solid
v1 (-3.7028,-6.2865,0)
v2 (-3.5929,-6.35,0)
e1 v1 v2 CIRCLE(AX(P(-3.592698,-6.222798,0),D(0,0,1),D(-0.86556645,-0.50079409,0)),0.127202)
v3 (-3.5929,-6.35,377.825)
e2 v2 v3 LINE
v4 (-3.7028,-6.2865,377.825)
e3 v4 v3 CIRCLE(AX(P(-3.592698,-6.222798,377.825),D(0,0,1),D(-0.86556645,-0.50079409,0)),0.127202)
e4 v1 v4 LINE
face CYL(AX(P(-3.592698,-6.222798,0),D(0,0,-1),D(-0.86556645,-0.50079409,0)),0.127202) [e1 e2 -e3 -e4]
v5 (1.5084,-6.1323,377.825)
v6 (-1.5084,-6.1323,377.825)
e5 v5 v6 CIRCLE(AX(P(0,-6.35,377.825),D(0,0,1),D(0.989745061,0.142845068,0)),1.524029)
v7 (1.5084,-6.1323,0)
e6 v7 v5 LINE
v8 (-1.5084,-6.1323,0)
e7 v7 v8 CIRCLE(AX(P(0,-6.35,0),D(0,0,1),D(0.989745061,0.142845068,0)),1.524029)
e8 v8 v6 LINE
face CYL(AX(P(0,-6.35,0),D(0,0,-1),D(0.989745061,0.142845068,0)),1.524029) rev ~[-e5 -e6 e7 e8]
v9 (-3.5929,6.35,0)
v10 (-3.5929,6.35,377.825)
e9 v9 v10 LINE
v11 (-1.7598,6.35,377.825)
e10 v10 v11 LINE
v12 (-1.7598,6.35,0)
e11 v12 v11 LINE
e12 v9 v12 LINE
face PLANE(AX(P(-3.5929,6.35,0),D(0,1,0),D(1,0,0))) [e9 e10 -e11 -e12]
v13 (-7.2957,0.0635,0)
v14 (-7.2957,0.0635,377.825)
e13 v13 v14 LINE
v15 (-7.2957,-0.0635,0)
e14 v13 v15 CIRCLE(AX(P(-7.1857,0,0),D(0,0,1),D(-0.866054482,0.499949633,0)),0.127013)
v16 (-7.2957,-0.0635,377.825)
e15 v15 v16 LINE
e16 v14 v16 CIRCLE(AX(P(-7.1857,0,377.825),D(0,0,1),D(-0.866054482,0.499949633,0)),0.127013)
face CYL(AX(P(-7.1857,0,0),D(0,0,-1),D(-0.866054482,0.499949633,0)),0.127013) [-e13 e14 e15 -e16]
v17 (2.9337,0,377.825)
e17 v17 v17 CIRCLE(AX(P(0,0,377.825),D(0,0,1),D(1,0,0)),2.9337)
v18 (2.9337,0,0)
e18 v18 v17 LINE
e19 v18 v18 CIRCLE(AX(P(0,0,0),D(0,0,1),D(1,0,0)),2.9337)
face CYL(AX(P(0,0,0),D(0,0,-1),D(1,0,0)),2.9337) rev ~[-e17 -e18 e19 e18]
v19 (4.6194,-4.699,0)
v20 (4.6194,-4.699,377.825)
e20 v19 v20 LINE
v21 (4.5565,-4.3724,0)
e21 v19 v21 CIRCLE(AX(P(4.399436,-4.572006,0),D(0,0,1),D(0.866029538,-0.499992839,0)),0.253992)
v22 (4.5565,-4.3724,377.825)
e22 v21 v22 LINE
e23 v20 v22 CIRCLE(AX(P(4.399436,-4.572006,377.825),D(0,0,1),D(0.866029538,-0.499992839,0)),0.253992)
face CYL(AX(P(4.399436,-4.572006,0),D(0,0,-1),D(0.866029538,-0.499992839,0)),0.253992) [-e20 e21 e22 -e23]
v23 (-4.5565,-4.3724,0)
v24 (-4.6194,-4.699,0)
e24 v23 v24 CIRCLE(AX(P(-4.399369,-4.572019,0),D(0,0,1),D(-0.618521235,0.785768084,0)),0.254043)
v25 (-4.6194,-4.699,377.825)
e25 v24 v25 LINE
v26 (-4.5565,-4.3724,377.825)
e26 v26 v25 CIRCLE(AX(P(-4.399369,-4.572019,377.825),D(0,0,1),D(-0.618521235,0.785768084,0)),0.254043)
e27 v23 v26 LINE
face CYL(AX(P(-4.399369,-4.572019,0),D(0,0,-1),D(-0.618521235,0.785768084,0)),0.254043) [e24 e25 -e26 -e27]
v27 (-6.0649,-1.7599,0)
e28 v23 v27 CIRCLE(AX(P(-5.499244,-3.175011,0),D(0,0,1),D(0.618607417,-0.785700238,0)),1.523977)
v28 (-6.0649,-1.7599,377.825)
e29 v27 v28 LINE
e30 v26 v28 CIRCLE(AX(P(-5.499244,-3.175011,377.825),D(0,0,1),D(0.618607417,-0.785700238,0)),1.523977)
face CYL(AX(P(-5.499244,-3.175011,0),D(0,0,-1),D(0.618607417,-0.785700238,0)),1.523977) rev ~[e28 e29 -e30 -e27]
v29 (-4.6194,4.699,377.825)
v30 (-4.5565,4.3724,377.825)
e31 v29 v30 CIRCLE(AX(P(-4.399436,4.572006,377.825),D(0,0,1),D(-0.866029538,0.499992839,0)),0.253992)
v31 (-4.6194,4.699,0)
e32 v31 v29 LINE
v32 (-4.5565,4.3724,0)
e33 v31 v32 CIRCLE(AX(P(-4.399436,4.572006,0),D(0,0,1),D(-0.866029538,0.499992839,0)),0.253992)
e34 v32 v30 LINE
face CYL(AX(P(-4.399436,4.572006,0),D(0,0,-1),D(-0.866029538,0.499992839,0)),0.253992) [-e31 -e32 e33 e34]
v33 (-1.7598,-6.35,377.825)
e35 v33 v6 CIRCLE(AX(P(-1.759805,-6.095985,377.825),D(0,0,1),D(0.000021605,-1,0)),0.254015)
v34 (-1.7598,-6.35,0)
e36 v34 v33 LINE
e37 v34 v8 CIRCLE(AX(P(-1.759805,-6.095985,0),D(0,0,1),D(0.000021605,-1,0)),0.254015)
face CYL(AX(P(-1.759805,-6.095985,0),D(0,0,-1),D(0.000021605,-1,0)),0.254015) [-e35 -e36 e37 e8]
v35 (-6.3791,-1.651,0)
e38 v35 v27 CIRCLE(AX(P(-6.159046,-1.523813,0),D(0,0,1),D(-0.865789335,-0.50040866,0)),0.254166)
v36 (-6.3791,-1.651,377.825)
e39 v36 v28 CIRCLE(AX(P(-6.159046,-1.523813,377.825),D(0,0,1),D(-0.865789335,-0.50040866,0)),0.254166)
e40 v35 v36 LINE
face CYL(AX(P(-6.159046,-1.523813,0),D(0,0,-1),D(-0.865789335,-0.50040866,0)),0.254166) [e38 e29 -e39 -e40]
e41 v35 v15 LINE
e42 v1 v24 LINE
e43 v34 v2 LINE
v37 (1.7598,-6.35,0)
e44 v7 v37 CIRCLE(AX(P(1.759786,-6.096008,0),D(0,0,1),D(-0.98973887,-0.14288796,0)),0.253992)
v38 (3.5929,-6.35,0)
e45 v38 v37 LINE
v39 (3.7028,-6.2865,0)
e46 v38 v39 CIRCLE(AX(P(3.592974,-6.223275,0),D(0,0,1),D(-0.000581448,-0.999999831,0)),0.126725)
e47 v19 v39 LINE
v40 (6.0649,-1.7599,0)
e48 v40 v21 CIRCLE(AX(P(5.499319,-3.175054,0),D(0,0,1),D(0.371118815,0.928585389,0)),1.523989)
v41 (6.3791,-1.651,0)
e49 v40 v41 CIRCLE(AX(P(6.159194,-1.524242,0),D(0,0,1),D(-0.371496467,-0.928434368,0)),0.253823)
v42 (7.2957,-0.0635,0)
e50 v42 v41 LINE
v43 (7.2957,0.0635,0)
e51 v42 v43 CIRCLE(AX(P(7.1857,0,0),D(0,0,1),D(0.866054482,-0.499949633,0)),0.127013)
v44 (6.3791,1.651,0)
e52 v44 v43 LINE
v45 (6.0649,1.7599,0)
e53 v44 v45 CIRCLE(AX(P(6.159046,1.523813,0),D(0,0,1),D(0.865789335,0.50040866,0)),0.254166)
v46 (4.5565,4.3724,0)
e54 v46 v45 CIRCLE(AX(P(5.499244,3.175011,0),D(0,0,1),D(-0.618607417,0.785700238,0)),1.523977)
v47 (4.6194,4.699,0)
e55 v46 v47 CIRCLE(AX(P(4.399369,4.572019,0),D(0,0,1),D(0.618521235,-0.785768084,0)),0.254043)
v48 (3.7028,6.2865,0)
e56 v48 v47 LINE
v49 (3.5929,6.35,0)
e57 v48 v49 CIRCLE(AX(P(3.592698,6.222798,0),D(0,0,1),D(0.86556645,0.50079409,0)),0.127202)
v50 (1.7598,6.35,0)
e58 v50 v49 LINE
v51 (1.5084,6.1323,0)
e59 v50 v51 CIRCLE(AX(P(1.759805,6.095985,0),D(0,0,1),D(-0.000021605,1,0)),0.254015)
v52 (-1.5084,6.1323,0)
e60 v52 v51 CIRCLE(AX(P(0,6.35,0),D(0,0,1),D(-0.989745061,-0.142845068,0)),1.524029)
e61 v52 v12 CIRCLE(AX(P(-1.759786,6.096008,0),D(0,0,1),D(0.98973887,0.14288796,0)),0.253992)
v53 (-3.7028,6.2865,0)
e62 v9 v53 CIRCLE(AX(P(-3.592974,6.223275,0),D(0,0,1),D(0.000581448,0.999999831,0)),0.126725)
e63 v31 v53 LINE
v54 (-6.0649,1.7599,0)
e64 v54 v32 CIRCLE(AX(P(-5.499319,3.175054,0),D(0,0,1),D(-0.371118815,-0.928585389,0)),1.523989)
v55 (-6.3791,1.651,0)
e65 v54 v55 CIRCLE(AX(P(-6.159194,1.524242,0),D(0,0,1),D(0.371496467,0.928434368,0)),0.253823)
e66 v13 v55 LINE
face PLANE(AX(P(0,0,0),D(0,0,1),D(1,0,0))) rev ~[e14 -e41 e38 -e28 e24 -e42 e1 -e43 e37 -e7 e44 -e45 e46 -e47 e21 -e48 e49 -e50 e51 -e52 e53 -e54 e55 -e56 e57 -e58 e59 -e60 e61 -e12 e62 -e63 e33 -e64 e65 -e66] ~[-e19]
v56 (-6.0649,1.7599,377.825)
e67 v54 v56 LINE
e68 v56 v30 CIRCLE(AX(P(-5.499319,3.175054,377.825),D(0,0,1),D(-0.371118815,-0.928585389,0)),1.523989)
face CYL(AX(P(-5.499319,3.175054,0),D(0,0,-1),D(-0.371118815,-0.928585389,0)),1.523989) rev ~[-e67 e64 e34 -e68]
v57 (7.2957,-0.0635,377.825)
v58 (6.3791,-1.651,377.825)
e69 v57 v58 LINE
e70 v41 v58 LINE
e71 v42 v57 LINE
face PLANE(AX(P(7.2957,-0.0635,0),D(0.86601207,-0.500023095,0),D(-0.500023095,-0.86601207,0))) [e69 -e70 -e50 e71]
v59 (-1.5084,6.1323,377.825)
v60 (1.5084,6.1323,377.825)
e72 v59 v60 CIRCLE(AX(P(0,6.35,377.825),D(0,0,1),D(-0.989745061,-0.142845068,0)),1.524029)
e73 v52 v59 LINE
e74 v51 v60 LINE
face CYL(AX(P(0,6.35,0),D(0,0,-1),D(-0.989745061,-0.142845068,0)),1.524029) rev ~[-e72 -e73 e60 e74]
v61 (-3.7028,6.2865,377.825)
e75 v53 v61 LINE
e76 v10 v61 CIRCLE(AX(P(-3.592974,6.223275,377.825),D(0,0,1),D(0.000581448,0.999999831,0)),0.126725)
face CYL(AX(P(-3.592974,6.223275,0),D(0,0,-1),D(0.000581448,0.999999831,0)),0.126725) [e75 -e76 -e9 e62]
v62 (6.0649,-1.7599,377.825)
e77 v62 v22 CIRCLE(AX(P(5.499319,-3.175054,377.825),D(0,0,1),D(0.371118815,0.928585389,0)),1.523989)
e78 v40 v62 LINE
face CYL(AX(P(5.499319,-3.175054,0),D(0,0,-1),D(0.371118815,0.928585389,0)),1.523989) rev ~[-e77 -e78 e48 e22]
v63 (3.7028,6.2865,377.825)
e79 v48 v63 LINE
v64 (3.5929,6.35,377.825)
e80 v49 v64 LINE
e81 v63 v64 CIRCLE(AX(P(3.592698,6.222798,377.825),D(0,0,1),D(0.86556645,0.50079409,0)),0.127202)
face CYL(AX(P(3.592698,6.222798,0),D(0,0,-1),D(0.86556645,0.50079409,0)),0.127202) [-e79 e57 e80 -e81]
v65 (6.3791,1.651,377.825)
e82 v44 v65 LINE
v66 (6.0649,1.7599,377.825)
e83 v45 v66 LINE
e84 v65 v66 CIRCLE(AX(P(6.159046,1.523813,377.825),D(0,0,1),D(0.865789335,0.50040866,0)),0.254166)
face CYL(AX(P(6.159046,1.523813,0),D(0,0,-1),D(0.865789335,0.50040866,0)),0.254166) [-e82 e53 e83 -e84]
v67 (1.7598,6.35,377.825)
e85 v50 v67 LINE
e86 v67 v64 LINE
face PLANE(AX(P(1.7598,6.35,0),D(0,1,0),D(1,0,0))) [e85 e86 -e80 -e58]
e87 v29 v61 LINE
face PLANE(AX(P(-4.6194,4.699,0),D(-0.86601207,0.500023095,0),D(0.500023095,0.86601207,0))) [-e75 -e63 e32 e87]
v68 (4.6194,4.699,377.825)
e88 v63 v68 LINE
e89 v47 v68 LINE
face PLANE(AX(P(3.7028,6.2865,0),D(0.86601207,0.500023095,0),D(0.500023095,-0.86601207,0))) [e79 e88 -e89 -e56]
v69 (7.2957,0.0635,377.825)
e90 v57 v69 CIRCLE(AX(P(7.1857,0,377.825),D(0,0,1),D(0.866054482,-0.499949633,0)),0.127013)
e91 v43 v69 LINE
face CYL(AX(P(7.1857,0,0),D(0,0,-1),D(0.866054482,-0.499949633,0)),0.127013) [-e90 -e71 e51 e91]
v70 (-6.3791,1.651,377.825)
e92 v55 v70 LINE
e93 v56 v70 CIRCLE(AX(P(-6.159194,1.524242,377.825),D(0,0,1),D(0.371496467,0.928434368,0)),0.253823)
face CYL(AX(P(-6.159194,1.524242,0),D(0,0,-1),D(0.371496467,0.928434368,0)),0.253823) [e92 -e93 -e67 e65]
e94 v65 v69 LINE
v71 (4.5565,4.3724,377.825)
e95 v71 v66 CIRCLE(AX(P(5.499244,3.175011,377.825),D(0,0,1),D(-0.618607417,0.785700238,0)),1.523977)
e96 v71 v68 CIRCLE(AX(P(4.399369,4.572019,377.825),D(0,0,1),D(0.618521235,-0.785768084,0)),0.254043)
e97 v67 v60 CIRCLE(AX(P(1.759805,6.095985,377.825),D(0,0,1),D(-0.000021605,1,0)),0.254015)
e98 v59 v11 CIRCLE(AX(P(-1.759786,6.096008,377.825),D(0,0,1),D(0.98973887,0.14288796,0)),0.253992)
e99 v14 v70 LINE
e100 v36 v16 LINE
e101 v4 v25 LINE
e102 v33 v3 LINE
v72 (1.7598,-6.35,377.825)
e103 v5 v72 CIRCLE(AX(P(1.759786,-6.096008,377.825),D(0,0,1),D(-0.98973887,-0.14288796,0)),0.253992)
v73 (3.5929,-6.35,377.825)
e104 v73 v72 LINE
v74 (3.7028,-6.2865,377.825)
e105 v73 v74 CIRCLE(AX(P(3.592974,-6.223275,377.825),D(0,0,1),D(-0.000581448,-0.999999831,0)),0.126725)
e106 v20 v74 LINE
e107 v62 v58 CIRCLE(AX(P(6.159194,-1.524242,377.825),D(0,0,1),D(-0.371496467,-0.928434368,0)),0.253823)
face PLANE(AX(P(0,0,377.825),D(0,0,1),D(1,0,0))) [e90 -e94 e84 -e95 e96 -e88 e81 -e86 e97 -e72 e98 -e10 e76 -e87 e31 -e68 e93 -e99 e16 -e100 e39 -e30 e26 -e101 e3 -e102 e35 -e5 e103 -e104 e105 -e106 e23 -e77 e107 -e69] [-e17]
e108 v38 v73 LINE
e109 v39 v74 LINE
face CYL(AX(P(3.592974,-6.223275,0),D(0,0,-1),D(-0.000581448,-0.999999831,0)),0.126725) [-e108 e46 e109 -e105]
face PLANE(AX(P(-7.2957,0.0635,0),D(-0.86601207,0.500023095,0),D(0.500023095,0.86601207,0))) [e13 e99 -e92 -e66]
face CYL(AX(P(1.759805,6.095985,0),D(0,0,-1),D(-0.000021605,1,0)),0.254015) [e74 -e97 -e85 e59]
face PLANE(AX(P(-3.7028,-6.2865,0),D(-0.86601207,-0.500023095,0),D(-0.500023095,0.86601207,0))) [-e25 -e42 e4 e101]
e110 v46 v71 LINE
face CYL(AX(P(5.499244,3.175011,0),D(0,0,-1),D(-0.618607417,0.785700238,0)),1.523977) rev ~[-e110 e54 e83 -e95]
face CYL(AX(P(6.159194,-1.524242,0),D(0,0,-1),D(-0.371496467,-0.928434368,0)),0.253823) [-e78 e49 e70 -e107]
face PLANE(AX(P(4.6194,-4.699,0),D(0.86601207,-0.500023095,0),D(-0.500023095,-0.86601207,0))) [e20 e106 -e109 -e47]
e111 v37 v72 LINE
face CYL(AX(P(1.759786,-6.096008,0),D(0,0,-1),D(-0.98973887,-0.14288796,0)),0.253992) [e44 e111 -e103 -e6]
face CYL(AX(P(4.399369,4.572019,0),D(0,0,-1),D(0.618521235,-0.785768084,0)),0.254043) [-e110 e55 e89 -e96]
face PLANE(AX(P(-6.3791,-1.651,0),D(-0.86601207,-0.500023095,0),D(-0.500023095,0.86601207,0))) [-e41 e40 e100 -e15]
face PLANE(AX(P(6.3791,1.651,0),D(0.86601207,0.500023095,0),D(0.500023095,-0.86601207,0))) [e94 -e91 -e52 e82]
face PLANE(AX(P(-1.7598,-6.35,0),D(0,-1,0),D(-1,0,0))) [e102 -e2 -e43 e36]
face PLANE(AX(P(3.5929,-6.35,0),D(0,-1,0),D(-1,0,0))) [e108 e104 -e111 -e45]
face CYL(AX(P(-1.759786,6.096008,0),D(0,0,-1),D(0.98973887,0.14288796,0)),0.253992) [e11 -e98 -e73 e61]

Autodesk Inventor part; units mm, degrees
ref_plane "YZ Plane" through (0, 0, 0) normal (1, 0, 0) x (0, 1, 0)
ref_plane "XZ Plane" through (0, 0, 0) normal (0, 1, 0) x (-1, 0, 0)
ref_plane "XY Plane" through (0, 0, 0) normal (0, 0, 1) x (1, 0, 0)
sketch "CrossHexProfile" plane through (0, 0, 0) normal (0, 0, 1) x (1, 0, 0)
  arc A0 (1.7598, 0) -> (1.5084, -0.2177) centre (1.7598, -0.254) ccw
  line L0 (1.7598, 0) -> (3.5929, 0)
  arc A1 (3.7028, -0.0635) -> (3.5929, 0) centre (3.5929, -0.127) ccw
  line L1 (3.7028, -0.0635) -> (4.6194, -1.651)
  arc A2 (4.5565, -1.9776) -> (4.6194, -1.651) centre (4.3994, -1.778) ccw
  arc A3 (4.5565, -1.9776) -> (6.0649, -4.5901) centre (5.4993, -3.175) ccw
  arc A4 (-1.5084, -0.2177) -> (1.5084, -0.2177) centre (0, 0) ccw
  arc A5 (-4.5565, -10.7224) -> (-4.6194, -11.049) centre (-4.3994, -10.922) ccw
  arc A6 (-4.5565, -10.7224) -> (-6.0649, -8.1099) centre (-5.4993, -9.525) ccw
  arc A7 (-6.3791, -8.001) -> (-6.0649, -8.1099) centre (-6.1592, -7.874) ccw
  line L2 (-6.3791, -8.001) -> (-7.2957, -6.4135)
  arc A8 (-7.2957, -6.2865) -> (-7.2957, -6.4135) centre (-7.1857, -6.35) ccw
  arc A9 (-6.0649, -4.5901) -> (-6.3791, -4.699) centre (-6.1592, -4.826) ccw
  line L3 (-7.2957, -6.2865) -> (-6.3791, -4.699)
  arc A10 (-1.5084, -0.2177) -> (-1.7598, 0) centre (-1.7598, -0.254) ccw
  line L4 (-3.5929, 0) -> (-1.7598, 0)
  arc A11 (-3.5929, 0) -> (-3.7028, -0.0635) centre (-3.5929, -0.127) ccw
  line L5 (-4.6194, -1.651) -> (-3.7028, -0.0635)
  arc A12 (-4.6194, -1.651) -> (-4.5565, -1.9776) centre (-4.3994, -1.778) ccw
  arc A13 (-6.0649, -4.5901) -> (-4.5565, -1.9776) centre (-5.4993, -3.175) ccw
  line L6 (-3.7028, -12.6365) -> (-4.6194, -11.049)
  circle A14 centre (0, -6.35) radius 2.9337
  arc A15 (-3.7028, -12.6365) -> (-3.5929, -12.7) centre (-3.5929, -12.573) ccw
  line L7 (-1.7598, -12.7) -> (-3.5929, -12.7)
  arc A16 (-1.7598, -12.7) -> (-1.5084, -12.4823) centre (-1.7598, -12.446) ccw
  arc A17 (1.5084, -12.4823) -> (-1.5084, -12.4823) centre (0, -12.7) ccw
  arc A18 (1.5084, -12.4823) -> (1.7598, -12.7) centre (1.7598, -12.446) ccw
  line L8 (3.5929, -12.7) -> (1.7598, -12.7)
  arc A19 (3.5929, -12.7) -> (3.7028, -12.6365) centre (3.5929, -12.573) ccw
  line L9 (4.6194, -11.049) -> (3.7028, -12.6365)
  arc A20 (6.3791, -4.699) -> (6.0649, -4.5901) centre (6.1592, -4.826) ccw
  line L10 (6.3791, -4.699) -> (7.2957, -6.2865)
  arc A21 (7.2957, -6.4135) -> (7.2957, -6.2865) centre (7.1857, -6.35) ccw
  arc A22 (6.0649, -8.1099) -> (6.3791, -8.001) centre (6.1592, -7.874) ccw
  line L11 (7.2957, -6.4135) -> (6.3791, -8.001)
  arc A23 (4.6194, -11.049) -> (4.5565, -10.7224) centre (4.3994, -10.922) ccw
  arc A24 (6.0649, -8.1099) -> (4.5565, -10.7224) centre (5.4993, -9.525) ccw
  point P0 (0, -6.35)
sketch "Sketch1" plane through (0, 0, 0) normal (0, 0, 1) x (1, 0, 0)
  arc A0 (1.7598, 6.35) -> (1.5084, 6.1323) centre (1.7598, 6.096) ccw
  line L0 (1.7598, 6.35) -> (3.5929, 6.35)
  arc A1 (3.7028, 6.2865) -> (3.5929, 6.35) centre (3.5929, 6.223) ccw
  line L1 (3.7028, 6.2865) -> (4.6194, 4.699)
  arc A2 (4.5565, 4.3724) -> (4.6194, 4.699) centre (4.3994, 4.572) ccw
  arc A3 (4.5565, 4.3724) -> (6.0649, 1.7599) centre (5.4993, 3.175) ccw
  arc A4 (-1.5084, 6.1323) -> (1.5084, 6.1323) centre (0, 6.35) ccw
  arc A5 (-4.5565, -4.3724) -> (-4.6194, -4.699) centre (-4.3994, -4.572) ccw
  arc A6 (-4.5565, -4.3724) -> (-6.0649, -1.7599) centre (-5.4993, -3.175) ccw
  arc A7 (-6.3791, -1.651) -> (-6.0649, -1.7599) centre (-6.1592, -1.524) ccw
  line L2 (-6.3791, -1.651) -> (-7.2957, -0.0635)
  arc A8 (-7.2957, 0.0635) -> (-7.2957, -0.0635) centre (-7.1857, 0) ccw
  arc A9 (-6.0649, 1.7599) -> (-6.3791, 1.651) centre (-6.1592, 1.524) ccw
  line L3 (-7.2957, 0.0635) -> (-6.3791, 1.651)
  arc A10 (-1.5084, 6.1323) -> (-1.7598, 6.35) centre (-1.7598, 6.096) ccw
  line L4 (-3.5929, 6.35) -> (-1.7598, 6.35)
  arc A11 (-3.5929, 6.35) -> (-3.7028, 6.2865) centre (-3.5929, 6.223) ccw
  line L5 (-4.6194, 4.699) -> (-3.7028, 6.2865)
  arc A12 (-4.6194, 4.699) -> (-4.5565, 4.3724) centre (-4.3994, 4.572) ccw
  arc A13 (-6.0649, 1.7599) -> (-4.5565, 4.3724) centre (-5.4993, 3.175) ccw
  line L6 (-3.7028, -6.2865) -> (-4.6194, -4.699)
  circle A14 centre (0, 0) radius 2.9337
  arc A15 (-3.7028, -6.2865) -> (-3.5929, -6.35) centre (-3.5929, -6.223) ccw
  line L7 (-1.7598, -6.35) -> (-3.5929, -6.35)
  arc A16 (-1.7598, -6.35) -> (-1.5084, -6.1323) centre (-1.7598, -6.096) ccw
  arc A17 (1.5084, -6.1323) -> (-1.5084, -6.1323) centre (0, -6.35) ccw
  arc A18 (1.5084, -6.1323) -> (1.7598, -6.35) centre (1.7598, -6.096) ccw
  line L8 (3.5929, -6.35) -> (1.7598, -6.35)
  arc A19 (3.5929, -6.35) -> (3.7028, -6.2865) centre (3.5929, -6.223) ccw
  line L9 (4.6194, -4.699) -> (3.7028, -6.2865)
  arc A20 (6.3791, 1.651) -> (6.0649, 1.7599) centre (6.1592, 1.524) ccw
  line L10 (6.3791, 1.651) -> (7.2957, 0.0635)
  arc A21 (7.2957, -0.0635) -> (7.2957, 0.0635) centre (7.1857, 0) ccw
  arc A22 (6.0649, -1.7599) -> (6.3791, -1.651) centre (6.1592, -1.524) ccw
  line L11 (7.2957, -0.0635) -> (6.3791, -1.651)
  arc A23 (4.6194, -4.699) -> (4.5565, -4.3724) centre (4.3994, -4.572) ccw
  arc A24 (6.0649, -1.7599) -> (4.5565, -4.3724) centre (5.4993, -3.175) ccw
  point P0 (0, 0)
extrude "Extrusion1" add sketch "Sketch1" along normal blind 377.825
properties part number "CrossHex 1825" material "Aluminum-6061"
